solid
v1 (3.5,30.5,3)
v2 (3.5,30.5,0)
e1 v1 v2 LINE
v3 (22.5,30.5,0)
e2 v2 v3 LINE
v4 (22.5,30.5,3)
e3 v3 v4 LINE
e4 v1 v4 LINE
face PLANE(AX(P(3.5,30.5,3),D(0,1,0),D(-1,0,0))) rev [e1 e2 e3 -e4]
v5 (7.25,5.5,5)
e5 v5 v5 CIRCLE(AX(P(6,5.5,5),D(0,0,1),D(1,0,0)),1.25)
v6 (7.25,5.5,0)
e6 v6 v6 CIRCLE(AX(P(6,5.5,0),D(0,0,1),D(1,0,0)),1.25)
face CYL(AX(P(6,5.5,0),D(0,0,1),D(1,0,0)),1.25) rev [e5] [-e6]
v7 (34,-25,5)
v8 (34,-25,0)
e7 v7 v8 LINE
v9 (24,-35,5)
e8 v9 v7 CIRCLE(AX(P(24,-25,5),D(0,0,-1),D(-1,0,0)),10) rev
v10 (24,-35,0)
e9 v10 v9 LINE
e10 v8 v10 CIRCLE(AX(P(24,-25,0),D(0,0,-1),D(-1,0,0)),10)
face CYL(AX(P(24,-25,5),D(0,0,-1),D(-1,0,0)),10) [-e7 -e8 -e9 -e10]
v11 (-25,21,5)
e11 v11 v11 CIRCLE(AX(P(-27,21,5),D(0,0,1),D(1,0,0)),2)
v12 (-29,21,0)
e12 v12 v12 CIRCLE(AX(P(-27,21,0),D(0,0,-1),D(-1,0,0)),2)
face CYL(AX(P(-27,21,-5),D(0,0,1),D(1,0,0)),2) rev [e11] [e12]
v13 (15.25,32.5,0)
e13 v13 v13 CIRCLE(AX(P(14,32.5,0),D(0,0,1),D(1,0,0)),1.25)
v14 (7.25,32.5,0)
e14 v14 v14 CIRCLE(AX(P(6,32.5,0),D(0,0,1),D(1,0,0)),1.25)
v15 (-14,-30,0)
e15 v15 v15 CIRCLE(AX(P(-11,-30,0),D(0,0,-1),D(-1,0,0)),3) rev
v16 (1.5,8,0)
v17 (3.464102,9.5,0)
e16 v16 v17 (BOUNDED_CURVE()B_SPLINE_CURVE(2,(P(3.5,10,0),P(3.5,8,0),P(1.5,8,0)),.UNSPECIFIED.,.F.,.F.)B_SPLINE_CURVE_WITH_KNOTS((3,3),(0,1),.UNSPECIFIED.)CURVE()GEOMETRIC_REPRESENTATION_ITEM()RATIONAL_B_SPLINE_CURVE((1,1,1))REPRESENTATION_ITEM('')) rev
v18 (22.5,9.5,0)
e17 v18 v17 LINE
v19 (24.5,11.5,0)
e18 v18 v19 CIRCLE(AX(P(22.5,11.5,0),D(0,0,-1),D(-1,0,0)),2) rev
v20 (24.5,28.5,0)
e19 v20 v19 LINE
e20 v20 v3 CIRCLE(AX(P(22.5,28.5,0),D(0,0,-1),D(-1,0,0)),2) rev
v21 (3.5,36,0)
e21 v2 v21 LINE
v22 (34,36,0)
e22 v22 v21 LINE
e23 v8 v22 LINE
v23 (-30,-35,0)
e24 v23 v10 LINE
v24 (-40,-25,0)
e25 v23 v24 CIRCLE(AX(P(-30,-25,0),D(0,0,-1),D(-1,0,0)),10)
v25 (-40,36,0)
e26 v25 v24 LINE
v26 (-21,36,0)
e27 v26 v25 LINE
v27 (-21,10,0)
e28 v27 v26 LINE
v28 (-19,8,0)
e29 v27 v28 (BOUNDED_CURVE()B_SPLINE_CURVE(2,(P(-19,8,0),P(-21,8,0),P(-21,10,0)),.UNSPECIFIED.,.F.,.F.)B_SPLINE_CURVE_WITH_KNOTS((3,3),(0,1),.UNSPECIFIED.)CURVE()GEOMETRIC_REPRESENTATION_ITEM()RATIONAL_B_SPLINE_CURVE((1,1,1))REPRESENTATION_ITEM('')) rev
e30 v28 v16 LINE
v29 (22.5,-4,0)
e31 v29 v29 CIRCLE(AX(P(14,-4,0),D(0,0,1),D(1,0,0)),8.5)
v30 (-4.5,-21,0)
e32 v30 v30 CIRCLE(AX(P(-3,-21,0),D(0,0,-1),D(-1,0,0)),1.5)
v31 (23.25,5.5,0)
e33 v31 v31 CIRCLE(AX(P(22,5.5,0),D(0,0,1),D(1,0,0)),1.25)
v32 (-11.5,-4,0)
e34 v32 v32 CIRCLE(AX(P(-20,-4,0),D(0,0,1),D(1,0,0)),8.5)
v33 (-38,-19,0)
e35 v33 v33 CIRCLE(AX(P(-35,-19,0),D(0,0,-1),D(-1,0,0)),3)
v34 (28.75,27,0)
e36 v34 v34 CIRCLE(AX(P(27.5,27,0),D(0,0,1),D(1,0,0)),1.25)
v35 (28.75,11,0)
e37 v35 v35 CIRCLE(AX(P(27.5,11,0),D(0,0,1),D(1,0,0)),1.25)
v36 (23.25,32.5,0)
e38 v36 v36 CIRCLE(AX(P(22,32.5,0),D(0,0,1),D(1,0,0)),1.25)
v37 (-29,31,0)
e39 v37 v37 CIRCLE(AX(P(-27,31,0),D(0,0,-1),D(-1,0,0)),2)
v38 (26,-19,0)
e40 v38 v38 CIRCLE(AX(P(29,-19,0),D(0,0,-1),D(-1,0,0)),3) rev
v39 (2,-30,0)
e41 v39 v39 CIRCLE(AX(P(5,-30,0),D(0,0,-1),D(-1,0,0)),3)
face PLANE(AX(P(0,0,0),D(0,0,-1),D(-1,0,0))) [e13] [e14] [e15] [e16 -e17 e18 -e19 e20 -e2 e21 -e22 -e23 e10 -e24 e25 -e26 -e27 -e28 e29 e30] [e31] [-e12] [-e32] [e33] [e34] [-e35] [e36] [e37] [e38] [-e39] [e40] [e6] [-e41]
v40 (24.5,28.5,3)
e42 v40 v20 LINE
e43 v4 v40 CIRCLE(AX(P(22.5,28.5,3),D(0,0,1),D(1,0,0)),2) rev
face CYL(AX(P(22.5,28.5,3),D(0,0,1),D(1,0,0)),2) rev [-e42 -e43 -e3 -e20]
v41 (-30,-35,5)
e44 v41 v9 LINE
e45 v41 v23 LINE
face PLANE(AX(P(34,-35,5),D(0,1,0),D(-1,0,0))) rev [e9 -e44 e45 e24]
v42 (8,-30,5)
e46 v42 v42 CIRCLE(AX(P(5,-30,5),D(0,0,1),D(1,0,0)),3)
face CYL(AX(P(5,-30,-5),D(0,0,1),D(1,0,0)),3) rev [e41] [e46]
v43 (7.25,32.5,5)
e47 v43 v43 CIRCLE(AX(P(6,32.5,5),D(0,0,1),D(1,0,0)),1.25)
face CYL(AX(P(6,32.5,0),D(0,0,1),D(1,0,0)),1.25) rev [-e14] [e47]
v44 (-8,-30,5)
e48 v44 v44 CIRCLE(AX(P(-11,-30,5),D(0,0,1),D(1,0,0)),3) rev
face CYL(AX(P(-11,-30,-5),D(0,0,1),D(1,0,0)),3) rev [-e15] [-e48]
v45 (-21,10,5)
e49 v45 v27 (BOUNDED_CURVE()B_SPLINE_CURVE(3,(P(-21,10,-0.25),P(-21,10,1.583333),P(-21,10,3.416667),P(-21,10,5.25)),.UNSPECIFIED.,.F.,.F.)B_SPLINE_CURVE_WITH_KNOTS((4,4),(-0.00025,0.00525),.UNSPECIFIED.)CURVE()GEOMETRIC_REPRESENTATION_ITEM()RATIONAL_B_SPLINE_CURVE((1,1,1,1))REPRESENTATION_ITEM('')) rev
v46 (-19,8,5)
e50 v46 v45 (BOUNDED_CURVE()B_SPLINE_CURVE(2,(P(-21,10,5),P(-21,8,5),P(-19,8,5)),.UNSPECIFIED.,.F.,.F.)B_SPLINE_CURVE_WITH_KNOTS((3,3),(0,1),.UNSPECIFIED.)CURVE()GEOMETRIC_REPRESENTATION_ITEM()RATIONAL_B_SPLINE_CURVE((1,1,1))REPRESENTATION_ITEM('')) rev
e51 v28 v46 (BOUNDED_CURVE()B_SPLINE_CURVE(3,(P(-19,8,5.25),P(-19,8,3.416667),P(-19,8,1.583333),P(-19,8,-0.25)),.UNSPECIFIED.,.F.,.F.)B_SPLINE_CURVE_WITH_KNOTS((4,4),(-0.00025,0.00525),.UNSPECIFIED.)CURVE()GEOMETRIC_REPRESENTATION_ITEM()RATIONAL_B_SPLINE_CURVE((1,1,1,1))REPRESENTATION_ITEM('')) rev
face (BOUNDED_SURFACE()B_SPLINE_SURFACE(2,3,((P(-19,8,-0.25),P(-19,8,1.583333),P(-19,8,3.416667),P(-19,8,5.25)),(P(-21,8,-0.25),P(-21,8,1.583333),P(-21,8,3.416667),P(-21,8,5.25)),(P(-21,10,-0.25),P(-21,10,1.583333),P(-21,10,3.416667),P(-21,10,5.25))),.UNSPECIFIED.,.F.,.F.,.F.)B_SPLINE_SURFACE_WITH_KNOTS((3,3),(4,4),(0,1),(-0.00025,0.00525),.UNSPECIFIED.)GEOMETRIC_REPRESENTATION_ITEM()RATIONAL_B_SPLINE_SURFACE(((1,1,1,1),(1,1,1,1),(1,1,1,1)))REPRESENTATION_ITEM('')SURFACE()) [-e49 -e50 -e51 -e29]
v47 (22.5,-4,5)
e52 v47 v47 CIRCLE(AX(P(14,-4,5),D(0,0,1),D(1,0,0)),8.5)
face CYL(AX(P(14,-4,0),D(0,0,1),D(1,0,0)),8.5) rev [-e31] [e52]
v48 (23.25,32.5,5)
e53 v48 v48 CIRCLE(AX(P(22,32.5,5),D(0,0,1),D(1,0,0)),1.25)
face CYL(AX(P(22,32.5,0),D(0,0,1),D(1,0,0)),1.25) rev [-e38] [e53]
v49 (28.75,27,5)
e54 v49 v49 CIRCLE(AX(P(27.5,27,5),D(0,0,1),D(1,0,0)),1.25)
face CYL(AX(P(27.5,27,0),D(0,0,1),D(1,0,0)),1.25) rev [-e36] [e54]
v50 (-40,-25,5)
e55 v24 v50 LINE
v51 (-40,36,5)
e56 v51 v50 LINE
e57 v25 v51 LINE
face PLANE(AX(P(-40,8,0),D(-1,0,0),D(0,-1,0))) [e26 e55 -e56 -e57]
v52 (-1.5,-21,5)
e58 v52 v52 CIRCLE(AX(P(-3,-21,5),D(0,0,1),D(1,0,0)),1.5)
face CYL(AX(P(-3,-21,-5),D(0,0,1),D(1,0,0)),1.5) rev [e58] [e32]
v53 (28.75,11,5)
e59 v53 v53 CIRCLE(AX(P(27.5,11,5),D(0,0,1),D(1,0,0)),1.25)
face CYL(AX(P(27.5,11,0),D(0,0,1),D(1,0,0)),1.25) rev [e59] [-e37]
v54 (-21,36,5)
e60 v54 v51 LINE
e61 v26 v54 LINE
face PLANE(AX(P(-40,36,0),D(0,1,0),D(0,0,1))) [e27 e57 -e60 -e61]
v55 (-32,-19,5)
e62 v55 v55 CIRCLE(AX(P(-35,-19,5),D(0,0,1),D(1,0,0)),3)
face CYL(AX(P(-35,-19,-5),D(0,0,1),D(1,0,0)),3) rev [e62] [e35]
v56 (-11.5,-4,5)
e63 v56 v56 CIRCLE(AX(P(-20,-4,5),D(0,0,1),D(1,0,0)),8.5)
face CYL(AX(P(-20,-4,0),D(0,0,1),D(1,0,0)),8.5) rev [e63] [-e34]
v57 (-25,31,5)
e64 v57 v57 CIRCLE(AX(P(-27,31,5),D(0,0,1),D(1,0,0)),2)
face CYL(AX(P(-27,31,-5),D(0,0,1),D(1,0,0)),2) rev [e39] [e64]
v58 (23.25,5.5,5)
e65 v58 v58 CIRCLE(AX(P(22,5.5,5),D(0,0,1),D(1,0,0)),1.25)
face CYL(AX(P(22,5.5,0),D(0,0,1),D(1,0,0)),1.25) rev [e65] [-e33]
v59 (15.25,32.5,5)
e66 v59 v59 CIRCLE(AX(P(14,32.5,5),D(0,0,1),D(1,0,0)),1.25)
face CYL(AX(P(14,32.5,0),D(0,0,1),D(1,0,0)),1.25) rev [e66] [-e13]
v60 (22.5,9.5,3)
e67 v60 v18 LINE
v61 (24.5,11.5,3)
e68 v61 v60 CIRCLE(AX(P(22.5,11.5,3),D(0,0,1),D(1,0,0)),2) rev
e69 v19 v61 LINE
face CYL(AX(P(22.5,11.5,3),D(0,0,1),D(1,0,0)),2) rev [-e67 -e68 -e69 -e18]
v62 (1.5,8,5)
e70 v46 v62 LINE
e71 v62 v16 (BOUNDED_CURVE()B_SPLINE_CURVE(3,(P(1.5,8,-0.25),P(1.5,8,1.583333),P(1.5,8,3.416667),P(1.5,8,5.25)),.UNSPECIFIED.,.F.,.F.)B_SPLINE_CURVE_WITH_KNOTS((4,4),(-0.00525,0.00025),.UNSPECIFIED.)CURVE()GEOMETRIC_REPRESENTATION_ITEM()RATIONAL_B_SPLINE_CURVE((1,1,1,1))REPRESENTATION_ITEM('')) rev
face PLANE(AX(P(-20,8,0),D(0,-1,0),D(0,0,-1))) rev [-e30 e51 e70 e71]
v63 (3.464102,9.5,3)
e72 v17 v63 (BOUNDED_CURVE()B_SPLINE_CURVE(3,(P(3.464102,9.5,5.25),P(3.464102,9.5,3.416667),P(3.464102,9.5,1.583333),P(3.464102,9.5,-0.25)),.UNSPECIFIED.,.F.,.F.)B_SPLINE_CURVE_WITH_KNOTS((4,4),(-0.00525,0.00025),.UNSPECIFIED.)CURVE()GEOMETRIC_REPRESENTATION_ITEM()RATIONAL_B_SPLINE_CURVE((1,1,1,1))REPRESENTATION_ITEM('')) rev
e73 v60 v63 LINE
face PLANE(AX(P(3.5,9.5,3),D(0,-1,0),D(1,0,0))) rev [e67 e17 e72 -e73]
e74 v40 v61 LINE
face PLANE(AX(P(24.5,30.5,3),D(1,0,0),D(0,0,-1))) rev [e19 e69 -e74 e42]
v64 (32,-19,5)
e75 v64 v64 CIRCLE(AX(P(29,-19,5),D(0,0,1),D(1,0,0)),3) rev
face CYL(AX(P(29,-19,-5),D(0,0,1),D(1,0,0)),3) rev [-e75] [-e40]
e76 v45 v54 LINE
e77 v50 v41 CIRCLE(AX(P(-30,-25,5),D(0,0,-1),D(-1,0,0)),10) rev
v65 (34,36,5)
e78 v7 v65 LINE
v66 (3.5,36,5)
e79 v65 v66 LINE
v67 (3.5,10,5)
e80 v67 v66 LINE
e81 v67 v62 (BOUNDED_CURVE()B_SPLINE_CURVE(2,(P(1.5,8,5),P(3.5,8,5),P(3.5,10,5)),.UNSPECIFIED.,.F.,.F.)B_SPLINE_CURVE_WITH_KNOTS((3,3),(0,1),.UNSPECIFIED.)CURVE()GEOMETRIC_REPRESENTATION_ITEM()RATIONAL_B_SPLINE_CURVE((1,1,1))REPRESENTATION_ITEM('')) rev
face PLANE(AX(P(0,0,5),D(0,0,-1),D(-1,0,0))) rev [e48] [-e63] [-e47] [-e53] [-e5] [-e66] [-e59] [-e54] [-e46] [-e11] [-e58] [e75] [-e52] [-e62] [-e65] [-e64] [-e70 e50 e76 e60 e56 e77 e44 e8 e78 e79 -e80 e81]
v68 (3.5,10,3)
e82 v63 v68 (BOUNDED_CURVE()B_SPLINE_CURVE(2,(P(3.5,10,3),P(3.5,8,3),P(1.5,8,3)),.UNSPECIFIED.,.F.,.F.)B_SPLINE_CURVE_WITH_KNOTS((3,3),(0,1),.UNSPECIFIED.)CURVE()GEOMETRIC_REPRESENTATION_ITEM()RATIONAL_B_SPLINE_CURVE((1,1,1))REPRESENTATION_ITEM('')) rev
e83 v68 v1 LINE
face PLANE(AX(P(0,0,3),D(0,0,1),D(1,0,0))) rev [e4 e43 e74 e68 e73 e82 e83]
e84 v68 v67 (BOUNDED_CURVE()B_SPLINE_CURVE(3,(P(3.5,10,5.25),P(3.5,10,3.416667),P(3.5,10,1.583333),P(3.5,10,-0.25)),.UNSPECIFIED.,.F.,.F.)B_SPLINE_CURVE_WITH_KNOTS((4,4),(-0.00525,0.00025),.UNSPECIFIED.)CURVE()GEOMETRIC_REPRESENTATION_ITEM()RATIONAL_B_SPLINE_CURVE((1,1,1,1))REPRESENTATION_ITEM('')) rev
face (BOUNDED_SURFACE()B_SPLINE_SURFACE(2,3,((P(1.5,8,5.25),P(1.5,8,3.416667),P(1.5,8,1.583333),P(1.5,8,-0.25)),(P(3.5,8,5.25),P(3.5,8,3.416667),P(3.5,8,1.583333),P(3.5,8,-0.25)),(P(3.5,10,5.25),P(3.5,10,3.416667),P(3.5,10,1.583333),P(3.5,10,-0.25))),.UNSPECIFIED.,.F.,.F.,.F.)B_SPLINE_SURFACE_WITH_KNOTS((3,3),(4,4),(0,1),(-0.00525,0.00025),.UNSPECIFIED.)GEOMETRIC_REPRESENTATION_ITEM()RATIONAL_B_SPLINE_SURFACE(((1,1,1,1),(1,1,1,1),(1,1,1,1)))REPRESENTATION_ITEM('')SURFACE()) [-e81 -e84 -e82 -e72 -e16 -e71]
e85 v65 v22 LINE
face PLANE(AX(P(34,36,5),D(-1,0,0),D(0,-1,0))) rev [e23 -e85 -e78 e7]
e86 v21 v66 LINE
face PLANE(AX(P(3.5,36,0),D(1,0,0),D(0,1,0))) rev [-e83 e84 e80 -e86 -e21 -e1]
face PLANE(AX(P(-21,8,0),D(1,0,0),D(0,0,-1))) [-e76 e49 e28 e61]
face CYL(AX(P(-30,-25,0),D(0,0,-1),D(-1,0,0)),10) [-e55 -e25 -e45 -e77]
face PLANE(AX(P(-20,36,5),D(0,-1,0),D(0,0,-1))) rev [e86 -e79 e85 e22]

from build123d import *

# Parameters (mm, degrees)
SZKIC1_W                    = 54
SZKIC1_H                    = 71
DODANIE_WYCI_GNI_CIE1_DEPTH = 5
SZKIC2_W                    = 23.5
SZKIC2_H                    = 28
WYTNIJ_WYCI_GNI_CIE1_DEPTH  = 5
SZKIC3_W                    = 21
SZKIC3_H                    = 21
WYTNIJ_WYCI_GNI_CIE2_DEPTH  = 3
SZKIC4_R                    = 1.25
WYTNIJ_WYCI_GNI_CIE3_DEPTH  = 5
SZKIC5_W                    = 20
SZKIC5_H                    = 43
DODANIE_WYCI_GNI_CIE2_DEPTH = 5
SZKIC6_R                    = 8.5
WYTNIJ_WYCI_GNI_CIE4_DEPTH  = 5
SZKIC7_R                    = 3
WYTNIJ_WYCI_GNI_CIE5_DEPTH  = 10
ZAOKR_GLENIE3_R             = 10
SZKIC8_W                    = 19
SZKIC8_H                    = 28
DODANIE_WYCI_GNI_CIE3_DEPTH = 5
ZAOKR_GLENIE2_SIZE          = 2
SZKIC9_R                    = 2
WYTNIJ_WYCI_GNI_CIE6_DEPTH  = 10
SZKIC10_R                   = 1.5
WYTNIJ_WYCI_GNI_CIE7_DEPTH  = 10
ZAOKR_GLENIE4_R             = 2


with BuildPart() as part:
    # Szkic1 → Dodanie-wyciągnięcie1 (new body)
    with BuildSketch(Plane.XY):
        with Locations((7, 0.5)):
            Rectangle(SZKIC1_W, SZKIC1_H)
    extrude(amount=DODANIE_WYCI_GNI_CIE1_DEPTH)

    # Szkic2 → Wytnij-wyciągnięcie1 (cut)
    with BuildSketch(Plane.XY.offset(5)):
        with Locations((-8.25, 22)):
            Rectangle(SZKIC2_W, SZKIC2_H)
    extrude(amount=-WYTNIJ_WYCI_GNI_CIE1_DEPTH, mode=Mode.SUBTRACT)

    # Szkic3 → Wytnij-wyciągnięcie2 (cut)
    with BuildSketch(Plane(origin=(0, 0, 0), x_dir=(-1, 0, 0), z_dir=(0, 0, -1))):
        with Locations((-14, 20)):
            Rectangle(SZKIC3_W, SZKIC3_H)
    extrude(amount=-WYTNIJ_WYCI_GNI_CIE2_DEPTH, mode=Mode.SUBTRACT)

    # Szkic4 → Wytnij-wyciągnięcie3 (cut)
    with BuildSketch(Plane.XY.offset(5)):
        with Locations((6, 32.5)):
            Circle(SZKIC4_R)
        with Locations((14, 32.5)):
            Circle(SZKIC4_R)
        with Locations((22, 32.5)):
            Circle(SZKIC4_R)
        with Locations((22, 5.5)):
            Circle(SZKIC4_R)
        with Locations((6, 5.5)):
            Circle(SZKIC4_R)
        with Locations((27.5, 27)):
            Circle(SZKIC4_R)
        with Locations((27.5, 11)):
            Circle(SZKIC4_R)
    extrude(amount=-WYTNIJ_WYCI_GNI_CIE3_DEPTH, mode=Mode.SUBTRACT)

    # Szkic5 → Dodanie-wyciągnięcie2 (add)
    with BuildSketch(Plane.XY.offset(5)):
        with Locations((-30, -13.5)):
            Rectangle(SZKIC5_W, SZKIC5_H)
    extrude(amount=-DODANIE_WYCI_GNI_CIE2_DEPTH)

    # Szkic6 → Wytnij-wyciągnięcie4 (cut)
    with BuildSketch(Plane.XY.offset(5)):
        with Locations((-20, -4)):
            Circle(SZKIC6_R)
        with Locations((14, -4)):
            Circle(SZKIC6_R)
    extrude(amount=-WYTNIJ_WYCI_GNI_CIE4_DEPTH, mode=Mode.SUBTRACT)

    # Szkic7 → Wytnij-wyciągnięcie5 (cut)
    with BuildSketch(Plane.XY.offset(5)):
        with Locations((-11, -30)):
            Circle(SZKIC7_R)
        with Locations((5, -30)):
            Circle(SZKIC7_R)
        with Locations((-35, -19)):
            Circle(SZKIC7_R)
        with Locations((29, -19)):
            Circle(SZKIC7_R)
    extrude(amount=-WYTNIJ_WYCI_GNI_CIE5_DEPTH, mode=Mode.SUBTRACT)

    # Zaokrąglenie3
    zaokr_glenie3_edges = [part.edges().sort_by_distance(p)[0] for p in [
        (-40, -35, 2.5),
        (34, -35, 2.5),
    ]]
    fillet(zaokr_glenie3_edges, radius=ZAOKR_GLENIE3_R)

    # Szkic8 → Dodanie-wyciągnięcie3 (add)
    with BuildSketch(Plane.XY.offset(5)):
        with Locations((-30.5, 22)):
            Rectangle(SZKIC8_W, SZKIC8_H)
    extrude(amount=-DODANIE_WYCI_GNI_CIE3_DEPTH)

    # Zaokrąglenie2
    # a fillet whose section is not a circle: 2 mm, written as the material it adds along each edge
    with BuildSketch(Plane(origin=(3.5, 8, 5), x_dir=(0, 1, 0), z_dir=(0, 0, -1))) as zaokr_glenie2_piece_1_section:
        with BuildLine():
            Bezier((ZAOKR_GLENIE2_SIZE, 0), (0, 0), (0, -ZAOKR_GLENIE2_SIZE), weights=[1, 1, 1])
            Line((0, -ZAOKR_GLENIE2_SIZE), (0, 0))
            Line((0, 0), (ZAOKR_GLENIE2_SIZE, 0))
        make_face()
    zaokr_glenie2_piece_1 = extrude(amount=5, mode=Mode.PRIVATE)
    zaokr_glenie2_piece_1 = split(zaokr_glenie2_piece_1, bisect_by=Plane(origin=(3.5, 9.5, 5), z_dir=(0, 1, 0)), keep=Keep.TOP, mode=Mode.PRIVATE)
    zaokr_glenie2_piece_1 = split(zaokr_glenie2_piece_1, bisect_by=Plane(origin=(3.5, 8, 3), z_dir=(0, 0, 1)), keep=Keep.TOP, mode=Mode.PRIVATE)
    add(zaokr_glenie2_piece_1)
    with BuildSketch(Plane(origin=(3.5, 8, 5), x_dir=(0, 1, 0), z_dir=(0, 0, -1))) as zaokr_glenie2_piece_2_section:
        with BuildLine():
            Bezier((ZAOKR_GLENIE2_SIZE, 0), (0, 0), (0, -ZAOKR_GLENIE2_SIZE), weights=[1, 1, 1])
            Line((0, -ZAOKR_GLENIE2_SIZE), (0, 0))
            Line((0, 0), (ZAOKR_GLENIE2_SIZE, 0))
        make_face()
    zaokr_glenie2_piece_2 = extrude(amount=5, mode=Mode.PRIVATE)
    zaokr_glenie2_piece_2 = split(zaokr_glenie2_piece_2, bisect_by=Plane(origin=(3.5, 9.5, 5), z_dir=(0, -1, 0)), keep=Keep.TOP, mode=Mode.PRIVATE)
    zaokr_glenie2_piece_2 = split(zaokr_glenie2_piece_2, bisect_by=Plane(origin=(3.5, 8, 3), z_dir=(0, 0, 1)), keep=Keep.TOP, mode=Mode.PRIVATE)
    add(zaokr_glenie2_piece_2)
    with BuildSketch(Plane(origin=(3.5, 8, 5), x_dir=(0, 1, 0), z_dir=(0, 0, -1))) as zaokr_glenie2_piece_3_section:
        with BuildLine():
            Bezier((ZAOKR_GLENIE2_SIZE, 0), (0, 0), (0, -ZAOKR_GLENIE2_SIZE), weights=[1, 1, 1])
            Line((0, -ZAOKR_GLENIE2_SIZE), (0, 0))
            Line((0, 0), (ZAOKR_GLENIE2_SIZE, 0))
        make_face()
    zaokr_glenie2_piece_3 = extrude(amount=5, mode=Mode.PRIVATE)
    zaokr_glenie2_piece_3 = split(zaokr_glenie2_piece_3, bisect_by=Plane(origin=(3.5, 9.5, 5), z_dir=(0, -1, 0)), keep=Keep.TOP, mode=Mode.PRIVATE)
    zaokr_glenie2_piece_3 = split(zaokr_glenie2_piece_3, bisect_by=Plane(origin=(3.5, 8, 3), z_dir=(0, 0, -1)), keep=Keep.TOP, mode=Mode.PRIVATE)
    add(zaokr_glenie2_piece_3)
    with BuildSketch(Plane(origin=(-21, 8, 5), x_dir=(1, 0, 0), z_dir=(0, 0, -1))) as zaokr_glenie2_piece_4:
        with BuildLine():
            Bezier((ZAOKR_GLENIE2_SIZE, 0), (0, 0), (0, -ZAOKR_GLENIE2_SIZE), weights=[1, 1, 1])
            Line((0, -ZAOKR_GLENIE2_SIZE), (0, 0))
            Line((0, 0), (ZAOKR_GLENIE2_SIZE, 0))
        make_face()
    extrude(amount=5)

    # Szkic9 → Wytnij-wyciągnięcie6 (cut)
    with BuildSketch(Plane.XY.offset(5)):
        with Locations((-27, 31)):
            Circle(SZKIC9_R)
        with Locations((-27, 21)):
            Circle(SZKIC9_R)
    extrude(amount=-WYTNIJ_WYCI_GNI_CIE6_DEPTH, mode=Mode.SUBTRACT)

    # Szkic10 → Wytnij-wyciągnięcie7 (cut)
    with BuildSketch(Plane.XY.offset(5)):
        with Locations((-3, -21)):
            Circle(SZKIC10_R)
    extrude(amount=-WYTNIJ_WYCI_GNI_CIE7_DEPTH, mode=Mode.SUBTRACT)

    # Zaokrąglenie4
    zaokr_glenie4_edges = [part.edges().sort_by_distance(p)[0] for p in [
        (24.5, 9.5, 1.5),
        (24.5, 30.5, 1.5),
    ]]
    fillet(zaokr_glenie4_edges, radius=ZAOKR_GLENIE4_R)


solid = part.part
